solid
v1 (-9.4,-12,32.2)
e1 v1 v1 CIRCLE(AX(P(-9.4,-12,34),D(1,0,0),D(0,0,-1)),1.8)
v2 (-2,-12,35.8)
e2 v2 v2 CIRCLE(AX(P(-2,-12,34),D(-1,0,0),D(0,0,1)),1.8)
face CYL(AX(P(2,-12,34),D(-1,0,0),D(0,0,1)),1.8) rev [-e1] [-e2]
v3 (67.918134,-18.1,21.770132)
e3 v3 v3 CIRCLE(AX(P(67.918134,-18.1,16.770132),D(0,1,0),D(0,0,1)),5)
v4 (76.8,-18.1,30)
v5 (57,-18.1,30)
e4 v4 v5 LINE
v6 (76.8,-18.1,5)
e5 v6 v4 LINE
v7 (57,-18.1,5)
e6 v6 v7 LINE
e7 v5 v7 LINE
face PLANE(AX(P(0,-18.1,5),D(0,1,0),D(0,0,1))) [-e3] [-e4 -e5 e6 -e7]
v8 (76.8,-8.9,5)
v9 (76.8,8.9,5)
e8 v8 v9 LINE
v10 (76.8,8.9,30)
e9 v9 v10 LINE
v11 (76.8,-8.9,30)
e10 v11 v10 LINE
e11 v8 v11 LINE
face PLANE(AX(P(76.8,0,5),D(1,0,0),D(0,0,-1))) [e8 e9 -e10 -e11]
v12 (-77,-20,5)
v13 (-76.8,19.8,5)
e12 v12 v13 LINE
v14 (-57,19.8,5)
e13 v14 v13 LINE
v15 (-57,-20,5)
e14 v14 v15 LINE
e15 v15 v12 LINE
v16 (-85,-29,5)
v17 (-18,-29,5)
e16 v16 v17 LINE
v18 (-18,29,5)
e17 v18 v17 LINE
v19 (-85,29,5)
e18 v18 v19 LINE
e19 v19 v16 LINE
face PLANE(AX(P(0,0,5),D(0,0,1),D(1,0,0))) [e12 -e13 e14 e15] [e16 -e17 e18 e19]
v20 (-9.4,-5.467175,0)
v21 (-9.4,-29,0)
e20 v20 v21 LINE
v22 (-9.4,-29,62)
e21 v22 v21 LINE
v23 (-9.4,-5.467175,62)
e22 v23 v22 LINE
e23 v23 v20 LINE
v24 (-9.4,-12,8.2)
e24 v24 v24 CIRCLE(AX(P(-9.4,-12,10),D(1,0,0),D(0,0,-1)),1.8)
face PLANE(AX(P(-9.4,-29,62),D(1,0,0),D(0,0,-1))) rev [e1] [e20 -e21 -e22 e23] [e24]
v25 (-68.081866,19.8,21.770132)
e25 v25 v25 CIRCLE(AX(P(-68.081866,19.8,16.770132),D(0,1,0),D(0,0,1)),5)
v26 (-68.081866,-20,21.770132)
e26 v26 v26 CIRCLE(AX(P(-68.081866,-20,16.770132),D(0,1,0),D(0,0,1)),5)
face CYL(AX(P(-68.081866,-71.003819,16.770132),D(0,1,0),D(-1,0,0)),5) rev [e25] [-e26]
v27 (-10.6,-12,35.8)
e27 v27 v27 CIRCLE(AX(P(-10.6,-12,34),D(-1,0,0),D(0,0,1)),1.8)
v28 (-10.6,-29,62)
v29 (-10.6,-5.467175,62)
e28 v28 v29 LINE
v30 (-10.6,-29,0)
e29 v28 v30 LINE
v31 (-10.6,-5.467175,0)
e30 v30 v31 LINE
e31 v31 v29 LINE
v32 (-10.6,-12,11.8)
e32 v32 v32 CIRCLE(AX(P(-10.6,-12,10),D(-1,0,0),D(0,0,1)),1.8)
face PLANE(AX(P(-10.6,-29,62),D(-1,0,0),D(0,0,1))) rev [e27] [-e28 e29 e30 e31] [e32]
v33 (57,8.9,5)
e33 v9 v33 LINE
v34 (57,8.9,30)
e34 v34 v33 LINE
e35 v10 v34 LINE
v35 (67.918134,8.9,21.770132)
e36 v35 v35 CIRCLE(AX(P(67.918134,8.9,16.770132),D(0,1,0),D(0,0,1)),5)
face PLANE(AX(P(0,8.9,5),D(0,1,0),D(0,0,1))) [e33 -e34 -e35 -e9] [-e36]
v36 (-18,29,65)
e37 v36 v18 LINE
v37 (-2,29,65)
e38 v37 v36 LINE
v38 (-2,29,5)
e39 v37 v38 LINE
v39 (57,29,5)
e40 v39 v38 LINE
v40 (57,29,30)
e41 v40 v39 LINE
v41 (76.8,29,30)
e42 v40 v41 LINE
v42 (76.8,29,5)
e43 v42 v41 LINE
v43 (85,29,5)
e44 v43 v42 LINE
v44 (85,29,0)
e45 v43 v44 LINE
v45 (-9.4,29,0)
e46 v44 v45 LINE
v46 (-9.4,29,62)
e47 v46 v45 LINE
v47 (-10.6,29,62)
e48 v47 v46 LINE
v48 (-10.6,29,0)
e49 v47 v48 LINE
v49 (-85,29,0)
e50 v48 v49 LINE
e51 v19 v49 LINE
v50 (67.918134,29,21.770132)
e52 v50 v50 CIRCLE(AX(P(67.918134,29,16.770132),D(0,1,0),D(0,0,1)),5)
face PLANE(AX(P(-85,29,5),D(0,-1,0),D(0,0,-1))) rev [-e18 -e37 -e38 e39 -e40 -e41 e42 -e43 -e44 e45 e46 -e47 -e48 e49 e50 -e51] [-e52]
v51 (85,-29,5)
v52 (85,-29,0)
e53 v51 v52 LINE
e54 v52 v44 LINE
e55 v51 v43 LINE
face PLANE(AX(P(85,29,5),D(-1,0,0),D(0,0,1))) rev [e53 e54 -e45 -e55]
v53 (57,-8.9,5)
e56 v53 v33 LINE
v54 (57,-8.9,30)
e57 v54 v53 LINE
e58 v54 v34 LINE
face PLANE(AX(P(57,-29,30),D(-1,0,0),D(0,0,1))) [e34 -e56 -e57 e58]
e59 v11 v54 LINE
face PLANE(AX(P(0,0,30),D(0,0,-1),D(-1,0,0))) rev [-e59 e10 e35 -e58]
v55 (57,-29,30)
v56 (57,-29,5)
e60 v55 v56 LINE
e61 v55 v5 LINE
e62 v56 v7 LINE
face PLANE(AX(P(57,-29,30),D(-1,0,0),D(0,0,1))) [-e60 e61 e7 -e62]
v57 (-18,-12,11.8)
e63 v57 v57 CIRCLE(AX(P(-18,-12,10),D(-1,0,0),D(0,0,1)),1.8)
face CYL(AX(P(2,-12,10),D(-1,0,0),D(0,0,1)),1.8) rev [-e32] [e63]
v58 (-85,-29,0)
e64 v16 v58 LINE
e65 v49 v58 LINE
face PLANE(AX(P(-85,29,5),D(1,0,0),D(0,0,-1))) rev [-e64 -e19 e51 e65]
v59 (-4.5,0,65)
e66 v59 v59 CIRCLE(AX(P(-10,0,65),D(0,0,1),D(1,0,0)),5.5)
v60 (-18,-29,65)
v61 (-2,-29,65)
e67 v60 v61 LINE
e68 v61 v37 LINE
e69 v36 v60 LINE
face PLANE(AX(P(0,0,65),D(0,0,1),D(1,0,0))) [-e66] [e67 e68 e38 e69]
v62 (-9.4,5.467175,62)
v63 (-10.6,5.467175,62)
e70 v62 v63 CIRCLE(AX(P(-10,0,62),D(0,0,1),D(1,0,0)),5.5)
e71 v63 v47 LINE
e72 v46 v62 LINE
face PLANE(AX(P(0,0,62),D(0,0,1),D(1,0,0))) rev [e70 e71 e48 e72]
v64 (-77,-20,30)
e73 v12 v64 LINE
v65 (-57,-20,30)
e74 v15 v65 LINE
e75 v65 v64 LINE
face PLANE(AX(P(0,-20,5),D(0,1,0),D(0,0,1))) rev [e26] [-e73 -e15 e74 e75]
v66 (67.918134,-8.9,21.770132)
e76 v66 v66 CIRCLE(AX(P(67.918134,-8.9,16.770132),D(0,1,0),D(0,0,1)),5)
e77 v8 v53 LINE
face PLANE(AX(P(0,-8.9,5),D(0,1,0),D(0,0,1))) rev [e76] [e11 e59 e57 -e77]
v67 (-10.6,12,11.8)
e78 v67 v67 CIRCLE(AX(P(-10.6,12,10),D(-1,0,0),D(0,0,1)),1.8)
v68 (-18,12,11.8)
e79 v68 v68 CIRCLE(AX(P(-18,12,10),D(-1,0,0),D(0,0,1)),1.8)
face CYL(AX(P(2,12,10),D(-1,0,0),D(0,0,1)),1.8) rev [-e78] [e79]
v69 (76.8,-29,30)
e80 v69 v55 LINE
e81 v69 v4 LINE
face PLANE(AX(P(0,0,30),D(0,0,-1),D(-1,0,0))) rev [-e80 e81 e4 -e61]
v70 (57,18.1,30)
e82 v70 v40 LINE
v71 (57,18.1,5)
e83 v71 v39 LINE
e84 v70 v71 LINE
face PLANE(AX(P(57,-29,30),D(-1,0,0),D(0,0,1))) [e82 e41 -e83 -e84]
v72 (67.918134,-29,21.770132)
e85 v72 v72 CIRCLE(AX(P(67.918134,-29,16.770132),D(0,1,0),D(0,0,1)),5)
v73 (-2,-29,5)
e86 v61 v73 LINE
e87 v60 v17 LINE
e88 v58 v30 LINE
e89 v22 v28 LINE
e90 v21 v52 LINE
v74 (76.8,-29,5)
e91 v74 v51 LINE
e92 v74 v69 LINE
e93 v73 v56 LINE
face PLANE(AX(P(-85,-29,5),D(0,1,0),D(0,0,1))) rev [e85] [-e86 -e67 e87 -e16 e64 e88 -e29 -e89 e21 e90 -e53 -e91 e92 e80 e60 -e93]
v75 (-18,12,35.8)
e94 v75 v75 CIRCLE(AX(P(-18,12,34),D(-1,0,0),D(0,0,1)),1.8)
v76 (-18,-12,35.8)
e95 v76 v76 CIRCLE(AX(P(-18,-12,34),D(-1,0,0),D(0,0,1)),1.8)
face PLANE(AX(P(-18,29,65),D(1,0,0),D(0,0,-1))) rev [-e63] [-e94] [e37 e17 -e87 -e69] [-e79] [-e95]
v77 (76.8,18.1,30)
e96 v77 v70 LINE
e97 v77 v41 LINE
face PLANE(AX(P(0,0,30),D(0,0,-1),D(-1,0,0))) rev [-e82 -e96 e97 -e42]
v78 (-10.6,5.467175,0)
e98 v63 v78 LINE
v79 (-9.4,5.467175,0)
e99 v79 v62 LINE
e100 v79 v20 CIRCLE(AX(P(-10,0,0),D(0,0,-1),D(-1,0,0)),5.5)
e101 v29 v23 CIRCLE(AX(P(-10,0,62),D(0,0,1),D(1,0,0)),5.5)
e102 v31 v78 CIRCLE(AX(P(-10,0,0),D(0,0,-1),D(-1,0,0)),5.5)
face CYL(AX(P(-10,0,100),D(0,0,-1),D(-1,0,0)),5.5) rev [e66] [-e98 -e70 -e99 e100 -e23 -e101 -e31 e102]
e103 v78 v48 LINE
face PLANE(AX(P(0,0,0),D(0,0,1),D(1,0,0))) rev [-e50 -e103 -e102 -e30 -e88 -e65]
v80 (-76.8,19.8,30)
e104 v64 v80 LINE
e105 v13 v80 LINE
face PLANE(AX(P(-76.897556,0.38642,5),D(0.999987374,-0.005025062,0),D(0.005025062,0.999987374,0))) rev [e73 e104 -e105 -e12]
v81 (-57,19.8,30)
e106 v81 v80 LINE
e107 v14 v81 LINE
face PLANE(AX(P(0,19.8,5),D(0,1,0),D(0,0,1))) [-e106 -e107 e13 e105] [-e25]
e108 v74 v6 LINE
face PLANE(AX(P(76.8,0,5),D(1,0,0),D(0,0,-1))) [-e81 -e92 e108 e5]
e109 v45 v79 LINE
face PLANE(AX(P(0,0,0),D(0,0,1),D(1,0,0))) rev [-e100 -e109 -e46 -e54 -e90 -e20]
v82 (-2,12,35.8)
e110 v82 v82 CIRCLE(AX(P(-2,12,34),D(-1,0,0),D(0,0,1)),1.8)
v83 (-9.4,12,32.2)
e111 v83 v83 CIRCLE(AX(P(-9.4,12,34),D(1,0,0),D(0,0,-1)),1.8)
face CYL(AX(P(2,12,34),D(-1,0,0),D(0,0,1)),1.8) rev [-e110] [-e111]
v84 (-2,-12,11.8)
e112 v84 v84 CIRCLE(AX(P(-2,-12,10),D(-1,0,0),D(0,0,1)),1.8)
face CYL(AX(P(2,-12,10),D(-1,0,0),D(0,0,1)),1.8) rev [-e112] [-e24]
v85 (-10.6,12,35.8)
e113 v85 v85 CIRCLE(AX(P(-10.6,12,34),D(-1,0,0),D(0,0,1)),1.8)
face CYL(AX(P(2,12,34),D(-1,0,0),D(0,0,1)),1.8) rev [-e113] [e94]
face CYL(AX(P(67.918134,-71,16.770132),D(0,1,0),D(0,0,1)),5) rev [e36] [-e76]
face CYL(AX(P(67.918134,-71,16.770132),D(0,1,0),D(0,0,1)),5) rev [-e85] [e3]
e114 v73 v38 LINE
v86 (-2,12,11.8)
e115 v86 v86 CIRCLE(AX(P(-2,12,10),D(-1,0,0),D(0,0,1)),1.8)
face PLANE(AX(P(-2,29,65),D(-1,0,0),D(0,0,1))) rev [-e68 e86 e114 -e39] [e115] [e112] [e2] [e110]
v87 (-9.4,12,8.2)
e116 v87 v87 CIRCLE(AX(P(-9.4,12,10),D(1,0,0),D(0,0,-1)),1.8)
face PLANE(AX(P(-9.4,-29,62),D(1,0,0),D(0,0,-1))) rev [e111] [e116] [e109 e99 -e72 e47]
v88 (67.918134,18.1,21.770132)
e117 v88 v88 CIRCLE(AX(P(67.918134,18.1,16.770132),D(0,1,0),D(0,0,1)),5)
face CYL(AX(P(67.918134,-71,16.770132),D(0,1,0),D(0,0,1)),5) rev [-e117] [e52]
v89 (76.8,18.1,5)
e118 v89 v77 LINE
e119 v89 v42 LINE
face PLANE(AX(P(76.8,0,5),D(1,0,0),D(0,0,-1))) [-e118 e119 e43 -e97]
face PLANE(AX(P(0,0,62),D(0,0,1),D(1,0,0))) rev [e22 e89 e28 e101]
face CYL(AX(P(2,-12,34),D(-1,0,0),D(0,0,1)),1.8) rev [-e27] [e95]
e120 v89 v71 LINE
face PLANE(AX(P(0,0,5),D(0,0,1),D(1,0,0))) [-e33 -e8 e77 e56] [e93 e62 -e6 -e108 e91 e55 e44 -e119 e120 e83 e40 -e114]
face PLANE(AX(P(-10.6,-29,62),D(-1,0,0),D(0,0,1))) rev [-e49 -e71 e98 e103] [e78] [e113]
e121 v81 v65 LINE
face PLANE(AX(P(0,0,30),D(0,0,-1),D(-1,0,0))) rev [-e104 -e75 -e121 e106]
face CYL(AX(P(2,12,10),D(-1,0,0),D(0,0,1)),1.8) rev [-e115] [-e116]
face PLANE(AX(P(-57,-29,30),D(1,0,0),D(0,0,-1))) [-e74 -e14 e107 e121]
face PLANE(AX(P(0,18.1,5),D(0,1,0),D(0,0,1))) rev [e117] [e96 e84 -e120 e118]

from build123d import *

# Parameters (mm, degrees)
SKETCH1_W           = 170
SKETCH1_H           = 58
BOSS_EXTRUDE1_DEPTH = 5
SKETCH2_W           = 28
SKETCH2_H           = 58
BOSS_EXTRUDE2_DEPTH = 25
CUT_EXTRUDE4_DEPTH  = 25
HOLE1_START         = -29
HOLE1_OUTLINE_R     = 5
HOLE1_DEPTH         = 58
SKETCH6_W           = 16
SKETCH6_H           = 58
BOSS_EXTRUDE3_DEPTH = 60
SKETCH7_W           = 1.2
SKETCH7_H           = 58
CUT_EXTRUDE5_DEPTH  = 62
SKETCH8_R           = 5.5
CUT_EXTRUDE6_DEPTH  = 100
SKETCH9_R           = 1.8
CUT_EXTRUDE7_DEPTH  = 20
HOLE3_START         = -20
HOLE3_OUTLINE_R     = 5
HOLE3_DEPTH         = 39.8


# Read off the part's stored shape, not the designer's step: Hole1, Hole3
with BuildPart() as part:
    # Sketch1 → Boss-Extrude1 (new body)
    with BuildSketch(Plane.XY):
        Rectangle(SKETCH1_W, SKETCH1_H)
    extrude(amount=BOSS_EXTRUDE1_DEPTH)

    # Sketch2 → Boss-Extrude2 (add)
    with BuildSketch(Plane(origin=(0, 0, 5), x_dir=(-1, 0, 0), z_dir=(0, 0, -1))):
        with Locations((71, 0)):
            Rectangle(SKETCH2_W, SKETCH2_H)
        with Locations((-71, 0)):
            Rectangle(SKETCH2_W, SKETCH2_H)
    extrude(amount=-BOSS_EXTRUDE2_DEPTH)

    # Sketch3 → Cut-Extrude4 (cut)
    with BuildSketch(Plane.XY.offset(30)):
        Polygon((-57, -29), (-57, -20), (-77, -20), (-76.8, 19.8), (-57, 19.8), (-57, 29), (-85, 29), (-85, -29), align=None)
        Polygon((56, 8.9), (56, 18.1), (76.8, 18.1), (76.8, 29), (85, 29), (85, -29), (76.8, -29), (76.8, -18.1), (56, -18.1), (56, -8.9), (76.8, -8.9), (76.8, 8.9), align=None)
    extrude(amount=-CUT_EXTRUDE4_DEPTH, mode=Mode.SUBTRACT)

    # Hole1 outline → Hole1 (cut)
    with BuildSketch(Plane(origin=(0, 0, 0), x_dir=(1, 0, 0), z_dir=(0, 1, 0)).offset(HOLE1_START)):
        with Locations((67.918134457, -16.770132162)):
            Circle(HOLE1_OUTLINE_R)
    extrude(amount=HOLE1_DEPTH, mode=Mode.SUBTRACT)

    # Sketch6 → Boss-Extrude3 (add)
    with BuildSketch(Plane.XY.offset(5)):
        with Locations((-10, 0)):
            Rectangle(SKETCH6_W, SKETCH6_H)
    extrude(amount=BOSS_EXTRUDE3_DEPTH)

    # Sketch7 → Cut-Extrude5 (cut)
    with BuildSketch(Plane(origin=(0, 0, 0), x_dir=(-1, 0, 0), z_dir=(0, 0, -1))):
        with Locations((10, 0)):
            Rectangle(SKETCH7_W, SKETCH7_H)
    extrude(amount=-CUT_EXTRUDE5_DEPTH, mode=Mode.SUBTRACT)

    # Sketch8 → Cut-Extrude6 (cut)
    with BuildSketch(Plane(origin=(0, 0, 0), x_dir=(-1, 0, 0), z_dir=(0, 0, -1))):
        with Locations(Location((10, 0, 0), (0, 0, 83.737086874))):
            Circle(SKETCH8_R)
    extrude(amount=-CUT_EXTRUDE6_DEPTH, mode=Mode.SUBTRACT)

    # Sketch9 → Cut-Extrude7 (cut)
    with BuildSketch(Plane.ZY.offset(18)):
        with Locations((34, 12)):
            Circle(SKETCH9_R)
        with Locations((10, 12)):
            Circle(SKETCH9_R)
        with Locations((10, -12)):
            Circle(SKETCH9_R)
        with Locations((34, -12)):
            Circle(SKETCH9_R)
    extrude(amount=-CUT_EXTRUDE7_DEPTH, mode=Mode.SUBTRACT)

    # Hole3 outline → Hole3 (cut)
    with BuildSketch(Plane(origin=(0, 0, 0), x_dir=(1, 0, 0), z_dir=(0, 1, 0)).offset(HOLE3_START)):
        with Locations((-68.081865543, -16.770132162)):
            Circle(HOLE3_OUTLINE_R)
    extrude(amount=HOLE3_DEPTH, mode=Mode.SUBTRACT)


solid = part.part
